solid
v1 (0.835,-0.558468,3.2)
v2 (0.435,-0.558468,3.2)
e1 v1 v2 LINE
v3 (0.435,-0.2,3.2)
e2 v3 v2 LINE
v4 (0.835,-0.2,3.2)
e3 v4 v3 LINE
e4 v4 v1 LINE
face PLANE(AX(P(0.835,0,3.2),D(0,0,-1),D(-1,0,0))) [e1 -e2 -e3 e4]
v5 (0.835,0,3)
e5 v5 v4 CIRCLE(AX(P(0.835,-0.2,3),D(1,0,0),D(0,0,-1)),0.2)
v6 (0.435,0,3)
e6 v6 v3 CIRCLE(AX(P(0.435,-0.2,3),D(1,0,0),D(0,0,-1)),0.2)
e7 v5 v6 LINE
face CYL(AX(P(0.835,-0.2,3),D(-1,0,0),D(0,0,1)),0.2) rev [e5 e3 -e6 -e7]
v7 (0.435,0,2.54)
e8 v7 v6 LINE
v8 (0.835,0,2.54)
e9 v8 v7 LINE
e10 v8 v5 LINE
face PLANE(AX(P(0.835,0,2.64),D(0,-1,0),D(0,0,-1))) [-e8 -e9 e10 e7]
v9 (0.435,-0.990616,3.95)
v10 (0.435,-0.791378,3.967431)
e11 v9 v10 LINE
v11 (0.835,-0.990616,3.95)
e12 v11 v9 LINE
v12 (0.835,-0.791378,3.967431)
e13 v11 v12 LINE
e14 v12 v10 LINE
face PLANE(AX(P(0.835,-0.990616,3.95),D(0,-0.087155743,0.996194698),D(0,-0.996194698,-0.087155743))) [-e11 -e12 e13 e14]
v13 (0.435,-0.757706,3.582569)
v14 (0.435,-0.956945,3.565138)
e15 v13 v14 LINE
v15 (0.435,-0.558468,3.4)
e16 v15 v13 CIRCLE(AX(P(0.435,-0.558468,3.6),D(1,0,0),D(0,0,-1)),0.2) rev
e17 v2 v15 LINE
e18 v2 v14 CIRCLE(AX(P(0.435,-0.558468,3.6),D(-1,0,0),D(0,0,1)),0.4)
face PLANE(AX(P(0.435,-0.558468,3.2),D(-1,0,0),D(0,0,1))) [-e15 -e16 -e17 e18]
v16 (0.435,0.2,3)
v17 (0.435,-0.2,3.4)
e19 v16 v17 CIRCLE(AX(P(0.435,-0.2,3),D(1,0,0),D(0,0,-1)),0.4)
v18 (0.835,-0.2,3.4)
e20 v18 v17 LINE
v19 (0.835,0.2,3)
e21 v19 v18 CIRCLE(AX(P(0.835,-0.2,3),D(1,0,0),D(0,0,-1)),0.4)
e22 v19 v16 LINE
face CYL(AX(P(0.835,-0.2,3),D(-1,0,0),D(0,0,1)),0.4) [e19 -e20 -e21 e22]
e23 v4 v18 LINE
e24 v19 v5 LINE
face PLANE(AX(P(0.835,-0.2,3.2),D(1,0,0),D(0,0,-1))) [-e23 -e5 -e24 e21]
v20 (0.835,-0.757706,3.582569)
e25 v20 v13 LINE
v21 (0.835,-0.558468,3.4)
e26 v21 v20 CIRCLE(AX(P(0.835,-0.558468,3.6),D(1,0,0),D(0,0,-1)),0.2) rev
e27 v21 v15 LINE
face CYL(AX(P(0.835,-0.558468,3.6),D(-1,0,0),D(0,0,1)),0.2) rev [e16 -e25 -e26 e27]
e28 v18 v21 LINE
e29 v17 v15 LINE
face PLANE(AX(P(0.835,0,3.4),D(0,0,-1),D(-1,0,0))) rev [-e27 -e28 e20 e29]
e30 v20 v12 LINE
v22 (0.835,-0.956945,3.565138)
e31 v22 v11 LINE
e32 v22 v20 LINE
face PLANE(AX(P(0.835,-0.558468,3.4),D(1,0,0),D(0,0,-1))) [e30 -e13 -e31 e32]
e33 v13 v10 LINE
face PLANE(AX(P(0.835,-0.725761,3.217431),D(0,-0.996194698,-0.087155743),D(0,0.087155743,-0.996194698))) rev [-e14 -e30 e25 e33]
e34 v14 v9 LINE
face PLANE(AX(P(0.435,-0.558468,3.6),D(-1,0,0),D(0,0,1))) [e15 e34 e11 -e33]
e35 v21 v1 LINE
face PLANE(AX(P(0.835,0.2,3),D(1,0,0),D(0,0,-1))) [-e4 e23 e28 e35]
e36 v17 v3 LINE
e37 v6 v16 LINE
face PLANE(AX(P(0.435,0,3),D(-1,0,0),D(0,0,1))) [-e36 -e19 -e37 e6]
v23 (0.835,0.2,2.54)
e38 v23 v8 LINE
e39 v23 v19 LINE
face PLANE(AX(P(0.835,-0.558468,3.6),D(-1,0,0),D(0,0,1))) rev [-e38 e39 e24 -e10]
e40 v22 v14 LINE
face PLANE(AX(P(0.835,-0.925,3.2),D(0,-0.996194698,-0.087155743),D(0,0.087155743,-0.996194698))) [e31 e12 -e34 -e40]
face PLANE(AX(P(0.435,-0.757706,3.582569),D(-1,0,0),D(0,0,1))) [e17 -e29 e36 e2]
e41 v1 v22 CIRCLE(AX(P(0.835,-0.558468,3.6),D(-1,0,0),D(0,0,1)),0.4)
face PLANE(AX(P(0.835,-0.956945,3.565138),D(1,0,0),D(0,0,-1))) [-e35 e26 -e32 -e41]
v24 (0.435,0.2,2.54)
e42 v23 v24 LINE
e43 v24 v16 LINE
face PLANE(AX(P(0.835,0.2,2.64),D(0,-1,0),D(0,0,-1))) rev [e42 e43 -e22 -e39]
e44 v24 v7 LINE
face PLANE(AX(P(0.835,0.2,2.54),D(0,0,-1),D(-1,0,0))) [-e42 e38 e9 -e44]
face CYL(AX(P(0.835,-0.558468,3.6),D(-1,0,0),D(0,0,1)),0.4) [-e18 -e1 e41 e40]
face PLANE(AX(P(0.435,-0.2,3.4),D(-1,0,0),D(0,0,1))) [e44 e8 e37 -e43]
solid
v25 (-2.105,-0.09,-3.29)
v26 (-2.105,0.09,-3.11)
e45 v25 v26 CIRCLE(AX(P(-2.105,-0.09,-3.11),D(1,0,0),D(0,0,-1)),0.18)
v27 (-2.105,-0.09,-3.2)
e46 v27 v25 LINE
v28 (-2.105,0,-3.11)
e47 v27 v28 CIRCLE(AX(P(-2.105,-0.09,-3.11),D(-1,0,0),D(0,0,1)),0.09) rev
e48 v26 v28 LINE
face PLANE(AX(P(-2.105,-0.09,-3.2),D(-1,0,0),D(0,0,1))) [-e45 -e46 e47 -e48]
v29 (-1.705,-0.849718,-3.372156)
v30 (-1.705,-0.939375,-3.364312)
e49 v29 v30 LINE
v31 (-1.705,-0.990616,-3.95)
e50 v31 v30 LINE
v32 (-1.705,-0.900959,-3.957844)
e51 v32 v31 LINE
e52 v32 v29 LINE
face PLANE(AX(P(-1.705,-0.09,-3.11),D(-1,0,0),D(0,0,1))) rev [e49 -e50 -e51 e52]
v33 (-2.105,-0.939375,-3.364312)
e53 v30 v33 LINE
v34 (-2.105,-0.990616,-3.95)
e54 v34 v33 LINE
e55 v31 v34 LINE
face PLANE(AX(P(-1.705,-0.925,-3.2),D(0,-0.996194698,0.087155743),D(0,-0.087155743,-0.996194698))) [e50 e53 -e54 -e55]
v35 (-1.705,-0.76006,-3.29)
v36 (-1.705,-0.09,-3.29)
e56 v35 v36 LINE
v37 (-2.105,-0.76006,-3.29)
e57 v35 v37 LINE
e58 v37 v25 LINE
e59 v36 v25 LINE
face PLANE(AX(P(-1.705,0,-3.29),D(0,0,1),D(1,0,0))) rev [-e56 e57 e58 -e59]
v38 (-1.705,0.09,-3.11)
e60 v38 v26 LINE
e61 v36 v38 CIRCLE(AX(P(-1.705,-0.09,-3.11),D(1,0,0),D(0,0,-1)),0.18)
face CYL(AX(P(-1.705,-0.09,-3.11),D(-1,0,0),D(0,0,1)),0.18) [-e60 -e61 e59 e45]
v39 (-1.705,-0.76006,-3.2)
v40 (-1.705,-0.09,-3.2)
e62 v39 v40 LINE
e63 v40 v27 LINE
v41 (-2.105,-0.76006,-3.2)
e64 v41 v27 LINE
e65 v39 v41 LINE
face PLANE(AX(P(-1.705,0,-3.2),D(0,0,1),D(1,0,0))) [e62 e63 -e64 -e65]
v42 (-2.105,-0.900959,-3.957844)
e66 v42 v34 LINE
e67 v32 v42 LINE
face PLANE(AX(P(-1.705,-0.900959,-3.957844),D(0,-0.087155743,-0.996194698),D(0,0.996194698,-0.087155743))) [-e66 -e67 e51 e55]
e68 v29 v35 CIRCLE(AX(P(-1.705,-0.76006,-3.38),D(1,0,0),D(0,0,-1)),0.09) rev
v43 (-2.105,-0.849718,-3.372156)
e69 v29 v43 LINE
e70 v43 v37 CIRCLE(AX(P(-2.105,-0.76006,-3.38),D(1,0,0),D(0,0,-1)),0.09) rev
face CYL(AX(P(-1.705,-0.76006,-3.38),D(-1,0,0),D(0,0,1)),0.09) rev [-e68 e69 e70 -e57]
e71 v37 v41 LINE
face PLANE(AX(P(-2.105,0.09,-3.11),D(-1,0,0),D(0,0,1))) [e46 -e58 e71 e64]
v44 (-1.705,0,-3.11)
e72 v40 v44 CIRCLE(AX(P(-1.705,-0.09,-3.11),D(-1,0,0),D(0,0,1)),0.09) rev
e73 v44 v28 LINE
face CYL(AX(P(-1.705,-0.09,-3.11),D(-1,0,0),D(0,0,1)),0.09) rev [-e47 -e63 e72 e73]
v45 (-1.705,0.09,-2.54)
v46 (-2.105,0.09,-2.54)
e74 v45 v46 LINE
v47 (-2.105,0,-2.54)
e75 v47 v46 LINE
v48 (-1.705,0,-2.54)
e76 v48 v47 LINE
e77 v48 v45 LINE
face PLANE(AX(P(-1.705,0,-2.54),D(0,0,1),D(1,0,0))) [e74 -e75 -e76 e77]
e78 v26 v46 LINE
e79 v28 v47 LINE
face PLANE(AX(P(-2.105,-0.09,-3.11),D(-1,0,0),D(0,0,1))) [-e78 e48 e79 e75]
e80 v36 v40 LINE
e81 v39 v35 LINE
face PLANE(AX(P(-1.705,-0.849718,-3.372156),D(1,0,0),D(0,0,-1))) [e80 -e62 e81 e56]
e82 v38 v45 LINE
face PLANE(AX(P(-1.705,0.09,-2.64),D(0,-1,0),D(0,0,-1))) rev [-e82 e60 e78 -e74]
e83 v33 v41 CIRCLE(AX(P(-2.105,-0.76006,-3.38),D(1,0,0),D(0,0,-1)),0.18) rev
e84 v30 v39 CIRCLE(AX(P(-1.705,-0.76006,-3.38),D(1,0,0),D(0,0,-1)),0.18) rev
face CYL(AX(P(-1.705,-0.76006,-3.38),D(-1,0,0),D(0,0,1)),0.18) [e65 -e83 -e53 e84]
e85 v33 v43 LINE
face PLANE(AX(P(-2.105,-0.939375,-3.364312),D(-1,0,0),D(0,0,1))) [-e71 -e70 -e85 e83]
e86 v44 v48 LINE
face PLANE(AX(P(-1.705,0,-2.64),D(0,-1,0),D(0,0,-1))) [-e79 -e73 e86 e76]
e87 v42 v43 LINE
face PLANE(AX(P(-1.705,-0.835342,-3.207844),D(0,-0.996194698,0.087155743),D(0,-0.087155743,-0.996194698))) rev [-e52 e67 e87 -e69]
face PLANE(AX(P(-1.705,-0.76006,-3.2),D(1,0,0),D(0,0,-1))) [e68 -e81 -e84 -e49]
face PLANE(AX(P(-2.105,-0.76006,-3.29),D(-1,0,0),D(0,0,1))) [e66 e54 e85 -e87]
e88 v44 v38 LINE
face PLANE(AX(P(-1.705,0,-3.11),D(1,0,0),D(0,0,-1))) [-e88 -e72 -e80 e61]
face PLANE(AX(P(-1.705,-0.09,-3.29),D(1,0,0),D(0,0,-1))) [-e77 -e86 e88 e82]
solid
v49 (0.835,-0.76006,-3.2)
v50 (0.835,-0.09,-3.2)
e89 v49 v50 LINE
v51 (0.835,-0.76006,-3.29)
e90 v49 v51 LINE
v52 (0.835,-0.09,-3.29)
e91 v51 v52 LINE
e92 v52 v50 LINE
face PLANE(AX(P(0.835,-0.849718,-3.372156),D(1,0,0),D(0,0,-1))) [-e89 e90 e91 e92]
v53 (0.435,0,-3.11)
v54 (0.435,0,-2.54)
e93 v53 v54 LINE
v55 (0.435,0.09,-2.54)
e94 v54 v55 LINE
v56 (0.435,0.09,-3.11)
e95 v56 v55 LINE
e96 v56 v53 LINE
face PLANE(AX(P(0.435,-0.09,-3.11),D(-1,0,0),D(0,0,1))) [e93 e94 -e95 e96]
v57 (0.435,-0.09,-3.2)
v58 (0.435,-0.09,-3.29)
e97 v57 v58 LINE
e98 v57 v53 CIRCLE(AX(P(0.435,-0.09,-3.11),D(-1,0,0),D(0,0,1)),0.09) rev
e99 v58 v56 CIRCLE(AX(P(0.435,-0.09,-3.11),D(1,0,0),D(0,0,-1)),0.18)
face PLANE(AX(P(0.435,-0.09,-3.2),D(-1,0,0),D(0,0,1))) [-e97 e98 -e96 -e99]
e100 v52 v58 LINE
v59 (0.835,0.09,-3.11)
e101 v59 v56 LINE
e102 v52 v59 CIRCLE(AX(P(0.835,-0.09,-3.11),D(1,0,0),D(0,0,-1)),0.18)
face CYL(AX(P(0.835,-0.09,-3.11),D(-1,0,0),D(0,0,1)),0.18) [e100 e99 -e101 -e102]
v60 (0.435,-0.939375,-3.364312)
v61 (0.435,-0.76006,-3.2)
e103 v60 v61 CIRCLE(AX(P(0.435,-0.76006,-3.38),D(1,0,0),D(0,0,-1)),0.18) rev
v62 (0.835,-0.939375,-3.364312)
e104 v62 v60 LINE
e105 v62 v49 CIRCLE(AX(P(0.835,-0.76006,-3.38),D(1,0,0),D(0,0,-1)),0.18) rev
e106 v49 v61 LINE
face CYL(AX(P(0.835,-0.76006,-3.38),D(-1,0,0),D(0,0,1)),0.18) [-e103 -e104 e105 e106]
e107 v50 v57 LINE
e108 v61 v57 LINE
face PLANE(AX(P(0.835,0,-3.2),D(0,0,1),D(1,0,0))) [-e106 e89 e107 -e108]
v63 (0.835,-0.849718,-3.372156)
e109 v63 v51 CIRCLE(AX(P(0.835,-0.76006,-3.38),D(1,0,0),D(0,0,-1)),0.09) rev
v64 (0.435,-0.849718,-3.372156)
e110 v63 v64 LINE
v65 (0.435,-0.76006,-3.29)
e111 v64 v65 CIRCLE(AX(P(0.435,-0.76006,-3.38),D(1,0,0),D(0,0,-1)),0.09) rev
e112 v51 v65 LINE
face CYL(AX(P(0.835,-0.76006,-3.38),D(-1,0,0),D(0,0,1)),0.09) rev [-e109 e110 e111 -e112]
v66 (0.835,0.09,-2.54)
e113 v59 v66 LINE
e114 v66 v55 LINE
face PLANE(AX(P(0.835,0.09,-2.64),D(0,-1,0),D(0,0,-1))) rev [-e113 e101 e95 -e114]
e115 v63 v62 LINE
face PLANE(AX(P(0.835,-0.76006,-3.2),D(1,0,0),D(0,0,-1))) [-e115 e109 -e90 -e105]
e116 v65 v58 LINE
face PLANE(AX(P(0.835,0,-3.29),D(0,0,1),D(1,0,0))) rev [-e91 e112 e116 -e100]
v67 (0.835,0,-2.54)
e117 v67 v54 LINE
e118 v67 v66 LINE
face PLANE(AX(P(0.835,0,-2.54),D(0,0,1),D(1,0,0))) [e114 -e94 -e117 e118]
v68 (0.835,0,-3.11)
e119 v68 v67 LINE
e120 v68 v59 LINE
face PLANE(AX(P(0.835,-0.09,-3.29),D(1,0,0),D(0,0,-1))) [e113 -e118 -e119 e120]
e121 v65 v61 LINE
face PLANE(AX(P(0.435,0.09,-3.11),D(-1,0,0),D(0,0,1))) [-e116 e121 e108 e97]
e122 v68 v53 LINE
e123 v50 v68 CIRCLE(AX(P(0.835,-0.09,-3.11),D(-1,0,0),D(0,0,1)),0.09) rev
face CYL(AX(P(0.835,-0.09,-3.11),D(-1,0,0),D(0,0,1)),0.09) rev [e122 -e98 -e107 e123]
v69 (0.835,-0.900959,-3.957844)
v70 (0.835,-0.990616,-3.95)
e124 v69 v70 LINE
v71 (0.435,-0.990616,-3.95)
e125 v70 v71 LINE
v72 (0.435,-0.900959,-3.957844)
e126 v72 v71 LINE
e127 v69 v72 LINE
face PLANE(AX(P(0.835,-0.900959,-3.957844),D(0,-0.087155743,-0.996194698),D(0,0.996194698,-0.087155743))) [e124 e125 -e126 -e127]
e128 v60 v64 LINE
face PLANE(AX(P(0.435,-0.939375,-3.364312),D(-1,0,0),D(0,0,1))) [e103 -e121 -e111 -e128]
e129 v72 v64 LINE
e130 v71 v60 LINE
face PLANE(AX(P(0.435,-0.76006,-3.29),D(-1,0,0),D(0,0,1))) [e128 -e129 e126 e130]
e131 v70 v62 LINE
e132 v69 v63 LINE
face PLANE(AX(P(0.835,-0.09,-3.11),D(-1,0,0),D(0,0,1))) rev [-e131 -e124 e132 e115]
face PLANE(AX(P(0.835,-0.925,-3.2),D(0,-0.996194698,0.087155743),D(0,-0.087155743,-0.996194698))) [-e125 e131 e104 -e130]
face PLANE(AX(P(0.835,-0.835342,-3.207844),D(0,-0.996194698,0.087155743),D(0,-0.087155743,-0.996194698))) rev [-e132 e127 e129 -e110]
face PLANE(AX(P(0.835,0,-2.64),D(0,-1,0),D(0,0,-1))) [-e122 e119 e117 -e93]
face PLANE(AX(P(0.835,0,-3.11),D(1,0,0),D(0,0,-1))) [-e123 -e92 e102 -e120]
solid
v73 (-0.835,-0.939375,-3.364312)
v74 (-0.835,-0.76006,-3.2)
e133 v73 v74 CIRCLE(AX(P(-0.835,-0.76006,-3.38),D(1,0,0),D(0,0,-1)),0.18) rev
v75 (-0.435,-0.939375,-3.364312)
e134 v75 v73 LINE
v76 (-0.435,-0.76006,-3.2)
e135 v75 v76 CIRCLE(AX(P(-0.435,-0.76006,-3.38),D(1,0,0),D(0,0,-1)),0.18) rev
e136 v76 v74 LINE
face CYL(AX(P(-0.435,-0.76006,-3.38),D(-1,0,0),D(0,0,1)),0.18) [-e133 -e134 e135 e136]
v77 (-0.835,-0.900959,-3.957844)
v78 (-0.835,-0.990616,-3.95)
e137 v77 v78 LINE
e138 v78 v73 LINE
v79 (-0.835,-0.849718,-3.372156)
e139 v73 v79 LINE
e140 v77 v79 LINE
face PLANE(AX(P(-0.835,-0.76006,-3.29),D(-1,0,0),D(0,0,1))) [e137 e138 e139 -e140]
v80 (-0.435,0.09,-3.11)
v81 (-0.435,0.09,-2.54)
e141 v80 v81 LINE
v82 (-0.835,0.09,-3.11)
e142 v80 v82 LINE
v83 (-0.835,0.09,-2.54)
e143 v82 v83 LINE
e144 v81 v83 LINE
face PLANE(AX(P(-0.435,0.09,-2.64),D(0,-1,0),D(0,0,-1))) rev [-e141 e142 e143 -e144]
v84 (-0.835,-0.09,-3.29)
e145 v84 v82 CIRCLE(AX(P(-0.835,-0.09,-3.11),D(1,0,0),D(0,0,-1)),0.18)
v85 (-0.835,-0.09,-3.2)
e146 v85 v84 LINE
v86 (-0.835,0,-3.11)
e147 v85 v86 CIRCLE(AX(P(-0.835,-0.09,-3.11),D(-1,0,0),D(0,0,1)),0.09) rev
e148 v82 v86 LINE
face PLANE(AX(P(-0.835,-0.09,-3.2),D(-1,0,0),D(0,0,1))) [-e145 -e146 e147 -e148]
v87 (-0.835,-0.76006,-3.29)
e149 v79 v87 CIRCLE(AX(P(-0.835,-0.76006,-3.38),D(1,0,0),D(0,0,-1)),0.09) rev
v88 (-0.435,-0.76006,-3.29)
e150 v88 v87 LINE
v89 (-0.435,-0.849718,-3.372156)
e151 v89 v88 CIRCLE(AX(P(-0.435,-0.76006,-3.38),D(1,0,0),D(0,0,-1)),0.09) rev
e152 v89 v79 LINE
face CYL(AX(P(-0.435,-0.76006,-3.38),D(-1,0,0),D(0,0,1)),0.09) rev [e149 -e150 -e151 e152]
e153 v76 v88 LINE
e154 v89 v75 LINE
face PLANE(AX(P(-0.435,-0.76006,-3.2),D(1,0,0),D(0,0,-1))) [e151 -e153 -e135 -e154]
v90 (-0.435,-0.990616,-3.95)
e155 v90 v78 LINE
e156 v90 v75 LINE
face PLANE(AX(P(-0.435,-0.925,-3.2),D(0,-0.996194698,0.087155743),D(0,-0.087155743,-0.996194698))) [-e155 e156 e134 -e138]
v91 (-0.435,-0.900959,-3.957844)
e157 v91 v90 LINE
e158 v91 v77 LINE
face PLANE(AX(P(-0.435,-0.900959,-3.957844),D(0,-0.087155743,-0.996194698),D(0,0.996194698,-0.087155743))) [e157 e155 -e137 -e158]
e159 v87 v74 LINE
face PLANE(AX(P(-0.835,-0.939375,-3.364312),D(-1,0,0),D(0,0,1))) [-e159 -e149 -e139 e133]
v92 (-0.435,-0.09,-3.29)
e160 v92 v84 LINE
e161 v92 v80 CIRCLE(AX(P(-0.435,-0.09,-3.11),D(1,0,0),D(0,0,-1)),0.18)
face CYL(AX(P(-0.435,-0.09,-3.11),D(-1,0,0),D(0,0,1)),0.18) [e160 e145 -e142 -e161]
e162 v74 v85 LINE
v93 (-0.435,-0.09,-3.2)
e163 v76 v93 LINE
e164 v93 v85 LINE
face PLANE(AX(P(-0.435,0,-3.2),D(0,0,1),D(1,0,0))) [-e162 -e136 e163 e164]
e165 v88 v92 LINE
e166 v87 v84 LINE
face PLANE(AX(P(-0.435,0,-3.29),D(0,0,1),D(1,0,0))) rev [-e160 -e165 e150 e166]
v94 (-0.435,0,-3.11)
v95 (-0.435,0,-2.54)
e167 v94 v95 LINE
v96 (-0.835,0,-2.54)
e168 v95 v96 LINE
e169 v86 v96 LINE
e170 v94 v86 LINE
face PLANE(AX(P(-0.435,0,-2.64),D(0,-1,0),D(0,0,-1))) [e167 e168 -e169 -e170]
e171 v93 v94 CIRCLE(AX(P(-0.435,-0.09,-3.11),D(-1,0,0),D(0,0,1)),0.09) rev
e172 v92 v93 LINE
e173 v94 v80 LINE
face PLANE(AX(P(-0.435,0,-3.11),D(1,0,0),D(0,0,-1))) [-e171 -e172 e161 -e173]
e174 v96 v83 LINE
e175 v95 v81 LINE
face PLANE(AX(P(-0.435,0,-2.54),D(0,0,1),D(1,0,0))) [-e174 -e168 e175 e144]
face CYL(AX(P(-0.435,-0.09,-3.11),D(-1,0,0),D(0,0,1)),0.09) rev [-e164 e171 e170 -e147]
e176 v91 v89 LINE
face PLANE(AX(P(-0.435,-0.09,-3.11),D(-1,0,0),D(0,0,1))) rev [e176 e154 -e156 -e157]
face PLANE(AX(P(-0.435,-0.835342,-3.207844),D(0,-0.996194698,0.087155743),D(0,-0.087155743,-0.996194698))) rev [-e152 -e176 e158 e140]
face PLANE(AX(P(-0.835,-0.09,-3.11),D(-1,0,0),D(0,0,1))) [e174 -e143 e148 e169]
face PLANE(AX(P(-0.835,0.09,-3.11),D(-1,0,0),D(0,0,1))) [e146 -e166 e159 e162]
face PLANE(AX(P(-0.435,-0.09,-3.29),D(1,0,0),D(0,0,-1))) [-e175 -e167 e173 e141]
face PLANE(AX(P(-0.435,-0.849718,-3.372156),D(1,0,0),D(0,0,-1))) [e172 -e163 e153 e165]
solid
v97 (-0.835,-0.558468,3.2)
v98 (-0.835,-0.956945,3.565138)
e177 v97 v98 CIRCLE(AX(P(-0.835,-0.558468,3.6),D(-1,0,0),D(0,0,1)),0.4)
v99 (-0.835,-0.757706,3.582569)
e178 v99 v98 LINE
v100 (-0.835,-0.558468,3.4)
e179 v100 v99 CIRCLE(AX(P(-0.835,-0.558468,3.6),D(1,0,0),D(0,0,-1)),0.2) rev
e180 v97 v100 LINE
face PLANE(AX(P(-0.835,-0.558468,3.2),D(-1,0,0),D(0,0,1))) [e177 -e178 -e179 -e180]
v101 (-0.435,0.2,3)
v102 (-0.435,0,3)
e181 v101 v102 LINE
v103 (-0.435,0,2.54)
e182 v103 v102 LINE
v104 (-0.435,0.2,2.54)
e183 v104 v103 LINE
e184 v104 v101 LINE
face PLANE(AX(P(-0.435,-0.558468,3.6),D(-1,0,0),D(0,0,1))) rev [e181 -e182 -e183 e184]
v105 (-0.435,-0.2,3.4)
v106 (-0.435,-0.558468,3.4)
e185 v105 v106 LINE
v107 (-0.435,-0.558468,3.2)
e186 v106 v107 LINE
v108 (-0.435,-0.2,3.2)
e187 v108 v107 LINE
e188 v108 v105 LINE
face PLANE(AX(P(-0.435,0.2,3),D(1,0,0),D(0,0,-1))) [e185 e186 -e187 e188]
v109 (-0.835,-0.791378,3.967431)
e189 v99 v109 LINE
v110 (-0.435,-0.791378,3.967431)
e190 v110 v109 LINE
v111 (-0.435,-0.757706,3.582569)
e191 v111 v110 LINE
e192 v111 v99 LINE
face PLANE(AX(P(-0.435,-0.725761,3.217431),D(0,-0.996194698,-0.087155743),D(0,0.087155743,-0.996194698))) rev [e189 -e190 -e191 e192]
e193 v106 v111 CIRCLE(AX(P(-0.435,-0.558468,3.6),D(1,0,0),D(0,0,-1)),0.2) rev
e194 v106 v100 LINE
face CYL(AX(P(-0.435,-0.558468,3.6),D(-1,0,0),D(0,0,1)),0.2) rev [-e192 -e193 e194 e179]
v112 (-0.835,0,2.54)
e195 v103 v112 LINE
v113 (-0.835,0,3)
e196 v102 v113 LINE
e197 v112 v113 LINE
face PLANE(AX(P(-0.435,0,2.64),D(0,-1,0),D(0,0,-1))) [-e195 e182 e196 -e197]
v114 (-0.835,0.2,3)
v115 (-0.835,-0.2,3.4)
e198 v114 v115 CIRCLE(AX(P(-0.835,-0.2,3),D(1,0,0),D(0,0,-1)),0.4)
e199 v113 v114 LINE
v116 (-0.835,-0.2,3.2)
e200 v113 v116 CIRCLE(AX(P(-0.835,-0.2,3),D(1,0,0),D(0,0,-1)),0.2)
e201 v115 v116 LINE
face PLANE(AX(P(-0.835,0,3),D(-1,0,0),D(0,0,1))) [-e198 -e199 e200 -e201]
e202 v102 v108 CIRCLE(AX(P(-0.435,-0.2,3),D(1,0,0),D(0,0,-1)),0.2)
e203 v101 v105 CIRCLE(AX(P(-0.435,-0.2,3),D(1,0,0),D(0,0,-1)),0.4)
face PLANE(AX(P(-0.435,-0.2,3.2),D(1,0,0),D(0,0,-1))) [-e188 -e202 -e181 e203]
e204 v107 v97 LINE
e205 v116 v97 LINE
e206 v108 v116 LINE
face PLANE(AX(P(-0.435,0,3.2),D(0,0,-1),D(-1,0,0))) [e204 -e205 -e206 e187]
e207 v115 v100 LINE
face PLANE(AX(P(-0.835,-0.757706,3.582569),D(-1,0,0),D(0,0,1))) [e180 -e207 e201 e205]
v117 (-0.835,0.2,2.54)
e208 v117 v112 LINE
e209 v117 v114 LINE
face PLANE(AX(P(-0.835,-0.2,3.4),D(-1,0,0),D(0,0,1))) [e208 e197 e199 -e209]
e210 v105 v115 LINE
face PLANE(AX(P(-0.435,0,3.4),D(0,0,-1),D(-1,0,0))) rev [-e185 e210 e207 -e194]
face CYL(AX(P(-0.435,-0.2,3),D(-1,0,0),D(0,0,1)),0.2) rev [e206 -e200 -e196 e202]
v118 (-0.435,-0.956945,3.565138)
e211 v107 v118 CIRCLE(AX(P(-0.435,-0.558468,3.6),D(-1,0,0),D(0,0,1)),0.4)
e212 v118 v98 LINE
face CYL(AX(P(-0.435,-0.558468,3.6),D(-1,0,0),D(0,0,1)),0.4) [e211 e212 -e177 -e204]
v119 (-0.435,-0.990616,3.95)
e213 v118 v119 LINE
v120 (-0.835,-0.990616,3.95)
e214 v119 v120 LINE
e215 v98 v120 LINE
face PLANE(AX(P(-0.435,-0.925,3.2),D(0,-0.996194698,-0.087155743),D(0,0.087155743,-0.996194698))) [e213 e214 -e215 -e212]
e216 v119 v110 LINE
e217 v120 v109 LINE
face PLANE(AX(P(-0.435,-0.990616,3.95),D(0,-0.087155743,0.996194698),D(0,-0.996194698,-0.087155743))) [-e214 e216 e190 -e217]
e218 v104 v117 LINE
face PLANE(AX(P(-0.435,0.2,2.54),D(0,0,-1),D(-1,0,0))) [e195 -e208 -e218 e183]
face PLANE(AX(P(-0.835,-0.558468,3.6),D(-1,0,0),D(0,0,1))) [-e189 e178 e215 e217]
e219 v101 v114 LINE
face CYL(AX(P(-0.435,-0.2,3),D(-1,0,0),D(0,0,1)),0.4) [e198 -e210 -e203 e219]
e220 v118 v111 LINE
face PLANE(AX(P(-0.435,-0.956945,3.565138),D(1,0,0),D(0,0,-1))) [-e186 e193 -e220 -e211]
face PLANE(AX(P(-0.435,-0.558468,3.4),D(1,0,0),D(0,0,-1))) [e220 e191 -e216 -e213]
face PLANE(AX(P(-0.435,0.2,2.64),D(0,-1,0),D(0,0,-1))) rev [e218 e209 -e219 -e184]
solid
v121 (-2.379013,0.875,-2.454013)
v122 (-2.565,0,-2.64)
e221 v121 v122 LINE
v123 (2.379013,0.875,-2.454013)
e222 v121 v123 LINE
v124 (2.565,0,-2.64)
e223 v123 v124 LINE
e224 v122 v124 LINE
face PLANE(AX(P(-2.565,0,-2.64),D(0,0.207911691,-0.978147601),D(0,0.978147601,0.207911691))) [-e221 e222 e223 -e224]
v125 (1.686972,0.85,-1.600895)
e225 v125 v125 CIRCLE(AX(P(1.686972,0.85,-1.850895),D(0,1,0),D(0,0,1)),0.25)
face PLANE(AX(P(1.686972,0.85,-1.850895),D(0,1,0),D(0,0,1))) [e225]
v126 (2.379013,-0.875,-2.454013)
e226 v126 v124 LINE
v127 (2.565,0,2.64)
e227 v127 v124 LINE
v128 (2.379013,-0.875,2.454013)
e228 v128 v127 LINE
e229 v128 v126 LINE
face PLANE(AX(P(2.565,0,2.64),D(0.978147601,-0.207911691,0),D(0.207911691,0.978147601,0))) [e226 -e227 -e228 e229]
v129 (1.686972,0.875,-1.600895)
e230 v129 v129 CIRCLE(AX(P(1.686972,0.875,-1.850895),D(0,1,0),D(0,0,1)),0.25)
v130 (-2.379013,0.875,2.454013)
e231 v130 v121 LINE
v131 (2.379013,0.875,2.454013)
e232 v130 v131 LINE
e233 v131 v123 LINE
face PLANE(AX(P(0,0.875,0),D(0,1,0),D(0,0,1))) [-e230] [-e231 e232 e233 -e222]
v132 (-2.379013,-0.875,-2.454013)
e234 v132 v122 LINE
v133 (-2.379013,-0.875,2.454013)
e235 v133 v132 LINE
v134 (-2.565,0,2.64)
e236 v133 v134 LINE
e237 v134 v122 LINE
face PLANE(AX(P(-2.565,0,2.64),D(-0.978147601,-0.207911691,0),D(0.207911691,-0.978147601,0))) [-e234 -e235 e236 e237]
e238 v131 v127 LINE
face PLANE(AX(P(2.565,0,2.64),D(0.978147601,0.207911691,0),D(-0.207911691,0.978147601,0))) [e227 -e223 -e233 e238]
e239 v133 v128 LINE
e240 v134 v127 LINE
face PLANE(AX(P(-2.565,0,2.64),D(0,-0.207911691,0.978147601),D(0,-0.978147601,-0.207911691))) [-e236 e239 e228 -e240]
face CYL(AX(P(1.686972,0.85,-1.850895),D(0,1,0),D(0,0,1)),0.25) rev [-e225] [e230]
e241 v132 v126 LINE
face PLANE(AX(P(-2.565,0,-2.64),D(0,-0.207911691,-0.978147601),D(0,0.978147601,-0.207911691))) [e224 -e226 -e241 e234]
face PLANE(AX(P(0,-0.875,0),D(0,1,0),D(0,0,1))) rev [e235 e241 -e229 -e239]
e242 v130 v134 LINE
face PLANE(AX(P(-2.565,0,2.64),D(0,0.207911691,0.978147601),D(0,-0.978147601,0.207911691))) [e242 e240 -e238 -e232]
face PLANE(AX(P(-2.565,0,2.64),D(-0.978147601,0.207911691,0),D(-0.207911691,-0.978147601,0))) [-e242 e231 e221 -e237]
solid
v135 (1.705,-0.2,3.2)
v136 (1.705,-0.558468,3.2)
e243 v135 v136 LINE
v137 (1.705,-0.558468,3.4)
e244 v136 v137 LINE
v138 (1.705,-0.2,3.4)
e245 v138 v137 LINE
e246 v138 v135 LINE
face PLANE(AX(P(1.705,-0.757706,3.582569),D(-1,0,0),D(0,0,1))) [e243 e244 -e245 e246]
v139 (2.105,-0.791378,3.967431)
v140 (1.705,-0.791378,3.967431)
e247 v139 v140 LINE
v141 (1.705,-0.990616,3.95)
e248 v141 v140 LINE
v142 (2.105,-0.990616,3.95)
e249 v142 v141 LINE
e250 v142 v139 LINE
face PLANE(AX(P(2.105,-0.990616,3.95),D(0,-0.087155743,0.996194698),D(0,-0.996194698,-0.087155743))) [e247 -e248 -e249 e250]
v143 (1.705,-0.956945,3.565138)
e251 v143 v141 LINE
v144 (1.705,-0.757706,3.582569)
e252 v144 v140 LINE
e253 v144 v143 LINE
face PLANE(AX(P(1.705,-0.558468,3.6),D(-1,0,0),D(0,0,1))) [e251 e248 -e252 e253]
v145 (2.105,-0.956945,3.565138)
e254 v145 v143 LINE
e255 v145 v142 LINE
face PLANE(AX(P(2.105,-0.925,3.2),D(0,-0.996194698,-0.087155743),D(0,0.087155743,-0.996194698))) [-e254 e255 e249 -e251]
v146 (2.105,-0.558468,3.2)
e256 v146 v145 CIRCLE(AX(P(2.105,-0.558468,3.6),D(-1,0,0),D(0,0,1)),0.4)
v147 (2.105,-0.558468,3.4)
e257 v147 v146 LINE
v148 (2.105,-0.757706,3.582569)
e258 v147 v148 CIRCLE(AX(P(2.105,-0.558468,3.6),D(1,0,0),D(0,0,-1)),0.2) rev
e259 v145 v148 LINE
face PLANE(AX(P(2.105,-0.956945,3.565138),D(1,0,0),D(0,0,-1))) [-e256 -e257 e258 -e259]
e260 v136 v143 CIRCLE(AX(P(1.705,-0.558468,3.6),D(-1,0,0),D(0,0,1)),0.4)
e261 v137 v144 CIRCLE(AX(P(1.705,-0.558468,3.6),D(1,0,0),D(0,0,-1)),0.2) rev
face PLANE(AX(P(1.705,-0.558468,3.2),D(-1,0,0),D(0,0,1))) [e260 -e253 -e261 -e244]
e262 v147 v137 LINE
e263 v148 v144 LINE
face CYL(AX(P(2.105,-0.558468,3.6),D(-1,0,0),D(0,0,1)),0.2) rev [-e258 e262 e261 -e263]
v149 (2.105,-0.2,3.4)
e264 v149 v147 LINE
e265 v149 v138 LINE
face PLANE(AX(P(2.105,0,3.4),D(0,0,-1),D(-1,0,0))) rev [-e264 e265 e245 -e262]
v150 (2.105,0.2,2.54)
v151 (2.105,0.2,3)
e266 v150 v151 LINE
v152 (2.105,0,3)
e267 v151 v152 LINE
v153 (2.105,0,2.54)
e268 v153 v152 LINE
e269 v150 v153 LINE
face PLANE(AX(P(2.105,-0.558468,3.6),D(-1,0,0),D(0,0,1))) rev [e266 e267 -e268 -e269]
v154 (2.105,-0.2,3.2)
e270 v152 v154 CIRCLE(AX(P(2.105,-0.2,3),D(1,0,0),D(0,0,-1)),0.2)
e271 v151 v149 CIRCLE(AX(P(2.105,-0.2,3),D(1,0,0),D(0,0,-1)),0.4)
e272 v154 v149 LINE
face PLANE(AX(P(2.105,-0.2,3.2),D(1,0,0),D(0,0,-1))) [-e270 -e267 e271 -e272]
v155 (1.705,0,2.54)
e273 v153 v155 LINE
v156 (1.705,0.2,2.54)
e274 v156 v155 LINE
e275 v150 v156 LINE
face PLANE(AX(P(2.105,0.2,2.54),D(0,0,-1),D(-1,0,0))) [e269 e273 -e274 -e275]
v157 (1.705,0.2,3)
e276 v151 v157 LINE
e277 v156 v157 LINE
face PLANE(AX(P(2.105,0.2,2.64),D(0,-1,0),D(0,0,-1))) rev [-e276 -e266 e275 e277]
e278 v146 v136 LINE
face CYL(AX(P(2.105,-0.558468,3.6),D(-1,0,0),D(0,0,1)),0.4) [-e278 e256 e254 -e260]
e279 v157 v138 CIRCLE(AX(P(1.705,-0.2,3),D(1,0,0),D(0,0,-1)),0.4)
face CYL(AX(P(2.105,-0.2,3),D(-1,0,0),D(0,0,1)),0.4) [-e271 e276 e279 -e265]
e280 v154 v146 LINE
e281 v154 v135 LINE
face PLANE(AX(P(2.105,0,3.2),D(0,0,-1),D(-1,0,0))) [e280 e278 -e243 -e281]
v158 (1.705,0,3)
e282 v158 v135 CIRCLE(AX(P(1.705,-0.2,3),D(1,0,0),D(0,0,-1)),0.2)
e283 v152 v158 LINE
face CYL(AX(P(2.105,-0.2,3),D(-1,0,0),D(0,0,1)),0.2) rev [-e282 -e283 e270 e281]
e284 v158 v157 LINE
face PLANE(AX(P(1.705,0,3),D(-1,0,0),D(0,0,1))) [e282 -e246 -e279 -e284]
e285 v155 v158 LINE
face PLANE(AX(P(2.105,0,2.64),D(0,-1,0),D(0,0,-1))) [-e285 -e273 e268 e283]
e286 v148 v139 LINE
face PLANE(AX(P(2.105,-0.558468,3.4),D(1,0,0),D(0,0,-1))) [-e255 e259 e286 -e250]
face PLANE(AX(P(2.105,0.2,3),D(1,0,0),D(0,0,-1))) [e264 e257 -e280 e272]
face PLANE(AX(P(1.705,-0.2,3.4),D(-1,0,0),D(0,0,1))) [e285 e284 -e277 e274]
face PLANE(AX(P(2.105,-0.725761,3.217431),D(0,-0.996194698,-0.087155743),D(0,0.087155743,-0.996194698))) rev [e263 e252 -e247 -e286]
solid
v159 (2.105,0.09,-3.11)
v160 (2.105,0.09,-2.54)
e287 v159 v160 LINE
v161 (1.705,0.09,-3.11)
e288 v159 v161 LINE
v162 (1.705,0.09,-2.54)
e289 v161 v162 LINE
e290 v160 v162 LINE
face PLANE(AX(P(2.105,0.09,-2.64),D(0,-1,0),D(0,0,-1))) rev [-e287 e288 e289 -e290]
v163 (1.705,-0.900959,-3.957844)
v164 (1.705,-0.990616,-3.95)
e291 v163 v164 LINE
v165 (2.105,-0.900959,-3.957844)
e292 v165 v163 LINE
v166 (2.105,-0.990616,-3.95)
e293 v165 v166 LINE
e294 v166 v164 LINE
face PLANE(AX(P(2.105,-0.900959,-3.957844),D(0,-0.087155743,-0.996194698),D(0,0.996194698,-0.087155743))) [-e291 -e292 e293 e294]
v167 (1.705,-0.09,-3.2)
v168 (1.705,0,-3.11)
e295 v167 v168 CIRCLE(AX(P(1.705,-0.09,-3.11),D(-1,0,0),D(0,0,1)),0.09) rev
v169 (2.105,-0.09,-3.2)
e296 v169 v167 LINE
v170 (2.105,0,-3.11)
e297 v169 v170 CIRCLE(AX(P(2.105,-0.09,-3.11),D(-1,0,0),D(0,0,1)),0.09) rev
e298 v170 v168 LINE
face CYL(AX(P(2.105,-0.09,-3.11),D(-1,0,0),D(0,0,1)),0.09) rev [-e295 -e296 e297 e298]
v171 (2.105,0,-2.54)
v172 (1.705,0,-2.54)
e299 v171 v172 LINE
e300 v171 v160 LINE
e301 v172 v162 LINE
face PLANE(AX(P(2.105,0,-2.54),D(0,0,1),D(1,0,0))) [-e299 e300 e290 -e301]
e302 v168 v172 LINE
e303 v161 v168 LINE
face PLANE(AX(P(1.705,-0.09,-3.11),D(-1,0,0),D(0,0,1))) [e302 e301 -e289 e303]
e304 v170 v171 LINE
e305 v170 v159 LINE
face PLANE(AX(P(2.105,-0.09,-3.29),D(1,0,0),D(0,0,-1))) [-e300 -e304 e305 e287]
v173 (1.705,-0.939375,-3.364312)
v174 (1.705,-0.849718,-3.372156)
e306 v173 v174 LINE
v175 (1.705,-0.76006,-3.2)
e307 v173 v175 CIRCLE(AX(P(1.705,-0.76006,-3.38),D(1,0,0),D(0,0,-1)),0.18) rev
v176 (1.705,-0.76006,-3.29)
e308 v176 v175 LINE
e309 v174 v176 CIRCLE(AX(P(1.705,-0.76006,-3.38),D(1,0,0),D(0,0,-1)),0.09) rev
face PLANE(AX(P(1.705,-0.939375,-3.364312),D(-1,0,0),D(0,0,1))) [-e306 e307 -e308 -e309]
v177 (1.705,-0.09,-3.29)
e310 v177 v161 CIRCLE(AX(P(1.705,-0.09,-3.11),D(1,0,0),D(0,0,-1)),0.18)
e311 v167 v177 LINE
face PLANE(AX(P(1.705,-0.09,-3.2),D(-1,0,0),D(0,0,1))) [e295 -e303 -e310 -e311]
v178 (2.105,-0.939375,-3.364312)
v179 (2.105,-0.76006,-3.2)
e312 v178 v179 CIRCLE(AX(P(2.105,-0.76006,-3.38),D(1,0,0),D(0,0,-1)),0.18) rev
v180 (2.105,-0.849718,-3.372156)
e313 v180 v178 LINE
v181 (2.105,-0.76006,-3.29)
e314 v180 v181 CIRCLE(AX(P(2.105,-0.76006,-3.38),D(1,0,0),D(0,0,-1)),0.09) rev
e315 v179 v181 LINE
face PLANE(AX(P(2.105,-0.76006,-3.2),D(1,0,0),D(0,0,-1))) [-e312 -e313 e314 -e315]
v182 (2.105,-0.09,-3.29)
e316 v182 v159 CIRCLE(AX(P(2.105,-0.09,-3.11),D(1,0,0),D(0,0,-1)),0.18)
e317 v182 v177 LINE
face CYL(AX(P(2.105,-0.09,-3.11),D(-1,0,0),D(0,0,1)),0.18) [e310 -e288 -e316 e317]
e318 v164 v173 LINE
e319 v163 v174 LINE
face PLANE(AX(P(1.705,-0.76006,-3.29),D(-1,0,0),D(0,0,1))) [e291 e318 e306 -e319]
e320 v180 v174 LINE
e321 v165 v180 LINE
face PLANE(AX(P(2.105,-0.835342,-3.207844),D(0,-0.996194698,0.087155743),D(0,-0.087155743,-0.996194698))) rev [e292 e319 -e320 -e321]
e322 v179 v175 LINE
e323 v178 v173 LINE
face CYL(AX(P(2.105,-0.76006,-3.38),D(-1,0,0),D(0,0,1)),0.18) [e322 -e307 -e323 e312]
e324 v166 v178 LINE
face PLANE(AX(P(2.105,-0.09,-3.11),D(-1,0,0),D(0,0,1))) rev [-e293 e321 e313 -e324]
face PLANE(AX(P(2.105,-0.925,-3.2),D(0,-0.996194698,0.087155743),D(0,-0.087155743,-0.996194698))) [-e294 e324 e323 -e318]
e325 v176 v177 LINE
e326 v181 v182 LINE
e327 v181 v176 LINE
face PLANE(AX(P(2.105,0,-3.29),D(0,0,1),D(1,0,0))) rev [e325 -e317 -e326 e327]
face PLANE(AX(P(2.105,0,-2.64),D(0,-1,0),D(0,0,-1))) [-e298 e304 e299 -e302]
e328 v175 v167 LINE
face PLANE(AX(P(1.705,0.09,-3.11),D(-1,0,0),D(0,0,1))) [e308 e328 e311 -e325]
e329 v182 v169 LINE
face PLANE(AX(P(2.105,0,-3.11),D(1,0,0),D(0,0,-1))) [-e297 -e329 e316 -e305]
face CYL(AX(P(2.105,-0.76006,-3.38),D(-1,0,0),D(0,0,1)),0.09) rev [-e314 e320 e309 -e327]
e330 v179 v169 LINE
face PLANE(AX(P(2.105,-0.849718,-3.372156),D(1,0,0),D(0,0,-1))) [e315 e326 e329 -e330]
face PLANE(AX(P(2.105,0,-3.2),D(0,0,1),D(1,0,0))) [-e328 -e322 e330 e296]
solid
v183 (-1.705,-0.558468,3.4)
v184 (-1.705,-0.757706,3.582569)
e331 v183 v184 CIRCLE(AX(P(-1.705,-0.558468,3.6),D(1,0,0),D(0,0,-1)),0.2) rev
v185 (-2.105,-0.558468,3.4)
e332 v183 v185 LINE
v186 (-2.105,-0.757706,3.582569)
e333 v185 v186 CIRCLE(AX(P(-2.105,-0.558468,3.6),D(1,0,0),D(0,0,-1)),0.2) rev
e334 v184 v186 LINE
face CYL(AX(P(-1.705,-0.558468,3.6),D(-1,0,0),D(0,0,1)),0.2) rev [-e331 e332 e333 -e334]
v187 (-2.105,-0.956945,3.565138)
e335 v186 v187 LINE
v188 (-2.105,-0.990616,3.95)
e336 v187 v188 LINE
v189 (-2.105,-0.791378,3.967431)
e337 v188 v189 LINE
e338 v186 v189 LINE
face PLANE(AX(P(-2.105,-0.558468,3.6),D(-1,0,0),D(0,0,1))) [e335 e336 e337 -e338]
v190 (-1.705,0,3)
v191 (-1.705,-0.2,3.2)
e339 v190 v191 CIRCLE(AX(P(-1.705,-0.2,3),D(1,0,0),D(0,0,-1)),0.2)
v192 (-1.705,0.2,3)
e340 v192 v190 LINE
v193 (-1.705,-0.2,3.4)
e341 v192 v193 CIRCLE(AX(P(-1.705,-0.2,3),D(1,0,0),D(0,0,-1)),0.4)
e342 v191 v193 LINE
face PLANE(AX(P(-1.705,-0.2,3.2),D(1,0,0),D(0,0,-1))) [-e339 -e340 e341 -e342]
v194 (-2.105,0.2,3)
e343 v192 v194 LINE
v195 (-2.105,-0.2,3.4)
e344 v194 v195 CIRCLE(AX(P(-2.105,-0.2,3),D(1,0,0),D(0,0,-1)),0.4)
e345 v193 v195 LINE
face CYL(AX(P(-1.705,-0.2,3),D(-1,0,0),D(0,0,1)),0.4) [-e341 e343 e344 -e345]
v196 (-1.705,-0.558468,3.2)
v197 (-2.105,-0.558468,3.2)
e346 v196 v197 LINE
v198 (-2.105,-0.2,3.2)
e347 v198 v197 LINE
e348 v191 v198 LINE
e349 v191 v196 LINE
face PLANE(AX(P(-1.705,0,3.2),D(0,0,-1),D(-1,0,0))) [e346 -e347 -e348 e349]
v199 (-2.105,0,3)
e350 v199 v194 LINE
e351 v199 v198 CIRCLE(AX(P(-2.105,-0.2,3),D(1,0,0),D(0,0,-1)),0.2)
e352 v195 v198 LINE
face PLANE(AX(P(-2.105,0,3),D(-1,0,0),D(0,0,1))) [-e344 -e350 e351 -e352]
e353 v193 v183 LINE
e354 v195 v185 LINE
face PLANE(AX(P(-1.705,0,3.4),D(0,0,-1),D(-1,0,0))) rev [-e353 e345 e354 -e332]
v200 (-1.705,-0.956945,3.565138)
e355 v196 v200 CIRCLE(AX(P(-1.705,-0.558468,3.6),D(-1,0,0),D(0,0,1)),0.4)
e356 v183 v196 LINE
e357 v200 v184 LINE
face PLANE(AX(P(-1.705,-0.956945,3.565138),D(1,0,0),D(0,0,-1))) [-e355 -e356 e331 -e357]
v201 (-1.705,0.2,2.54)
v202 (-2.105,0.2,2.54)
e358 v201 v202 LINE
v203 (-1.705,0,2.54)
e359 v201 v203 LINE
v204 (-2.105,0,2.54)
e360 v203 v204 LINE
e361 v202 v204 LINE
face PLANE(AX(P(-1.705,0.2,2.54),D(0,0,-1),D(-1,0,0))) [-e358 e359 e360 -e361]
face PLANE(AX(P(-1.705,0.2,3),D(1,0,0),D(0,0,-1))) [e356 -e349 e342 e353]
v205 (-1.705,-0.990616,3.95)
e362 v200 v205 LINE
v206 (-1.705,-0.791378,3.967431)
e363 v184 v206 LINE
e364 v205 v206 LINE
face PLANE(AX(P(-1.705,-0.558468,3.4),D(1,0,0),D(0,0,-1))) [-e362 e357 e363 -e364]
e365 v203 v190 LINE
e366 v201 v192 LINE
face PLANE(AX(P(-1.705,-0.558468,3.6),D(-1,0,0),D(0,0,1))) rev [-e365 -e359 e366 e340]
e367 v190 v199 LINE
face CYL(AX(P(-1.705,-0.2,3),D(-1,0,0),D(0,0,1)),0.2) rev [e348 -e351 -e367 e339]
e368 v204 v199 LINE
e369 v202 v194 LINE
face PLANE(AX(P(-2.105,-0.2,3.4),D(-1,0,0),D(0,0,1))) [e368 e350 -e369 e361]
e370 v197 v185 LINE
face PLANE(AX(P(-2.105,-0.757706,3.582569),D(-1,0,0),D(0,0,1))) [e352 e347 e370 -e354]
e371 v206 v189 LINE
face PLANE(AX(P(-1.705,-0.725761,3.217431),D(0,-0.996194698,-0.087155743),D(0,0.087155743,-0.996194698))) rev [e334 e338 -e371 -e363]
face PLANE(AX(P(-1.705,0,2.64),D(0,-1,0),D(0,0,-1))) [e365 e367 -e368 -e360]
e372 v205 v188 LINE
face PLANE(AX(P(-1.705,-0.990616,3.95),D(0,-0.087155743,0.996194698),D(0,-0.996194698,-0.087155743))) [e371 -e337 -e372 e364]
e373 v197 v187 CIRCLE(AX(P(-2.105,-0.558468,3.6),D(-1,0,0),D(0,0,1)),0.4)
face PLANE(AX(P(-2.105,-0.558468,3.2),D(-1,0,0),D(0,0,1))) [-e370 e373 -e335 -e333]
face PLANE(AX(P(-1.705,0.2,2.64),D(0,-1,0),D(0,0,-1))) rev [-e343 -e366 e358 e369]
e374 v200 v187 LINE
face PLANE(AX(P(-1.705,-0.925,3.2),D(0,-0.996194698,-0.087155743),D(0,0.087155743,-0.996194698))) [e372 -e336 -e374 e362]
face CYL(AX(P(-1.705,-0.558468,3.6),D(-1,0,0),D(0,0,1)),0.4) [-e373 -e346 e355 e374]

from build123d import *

# Parameters (mm, degrees)
SKETCH1_W                     = 5.13
SKETCH1_H                     = 5.28
BOSS_EXTRUDE1_DEPTH           = 0.875
BOSS_EXTRUDE1_TAPER           = 12
BOSS_EXTRUDE1_OTHER_WAY_DEPTH = 0.875
BOSS_EXTRUDE1_OTHER_WAY_TAPER = 12
BASE_FLANGE1_DEPTH            = 0.2
BASE_FLANGE1_DEPTH_BACK       = 0.2
LPATTERN1_COUNT               = 3
LPATTERN1_PITCH               = 1.27
LPATTERN1_2_COUNT             = 2
LPATTERN1_2_PITCH             = 1.27
BASE_FLANGE2_DEPTH            = 0.2
BASE_FLANGE2_DEPTH_BACK       = 0.2
LPATTERN2_COUNT               = 2
LPATTERN2_PITCH               = 1.27
LPATTERN2_2_COUNT             = 3
LPATTERN2_2_PITCH             = 1.27
SKETCH87_R                    = 0.25
CUT_EXTRUDE1_DEPTH            = 0.025


# Sheet-metal steps are written as plain solids
with BuildPart() as part:
    # Sketch1 → Boss-Extrude1 (new body)
    with BuildSketch(Plane(origin=(0, 0, 0), x_dir=(1, 0, 0), z_dir=(0, 1, 0))):
        Rectangle(SKETCH1_W, SKETCH1_H)
    extrude(amount=BOSS_EXTRUDE1_DEPTH, taper=BOSS_EXTRUDE1_TAPER)

    # Sketch1 → Boss-Extrude1 other way (add)
    with BuildSketch(Plane(origin=(0, 0, 0), x_dir=(1, 0, 0), z_dir=(0, 1, 0))):
        Rectangle(SKETCH1_W, SKETCH1_H)
    extrude(amount=-BOSS_EXTRUDE1_OTHER_WAY_DEPTH, taper=BOSS_EXTRUDE1_OTHER_WAY_TAPER)

    # Sketch87 → Cut-Extrude1 (cut)
    with BuildSketch(Plane(origin=(0, 0.875, 0), x_dir=(1, 0, 0), z_dir=(0, 1, 0))):
        with Locations(Location((1.686972144, 1.850895493, 0), (0, 0, 270))):
            Circle(SKETCH87_R)
    extrude(amount=-CUT_EXTRUDE1_DEPTH, mode=Mode.SUBTRACT)


with BuildPart() as body_2:
    # Sketch2 → Base-Flange1 (new, two sides: drawn at the far end of the back side and taken through both)
    with BuildSketch(Plane(origin=(-0.635, 0, 0), x_dir=(0, 0, -1), z_dir=(1, 0, 0)).offset(-BASE_FLANGE1_DEPTH_BACK)):
        with BuildLine():
            Line((-2.54, 0), (-2.64, 0))
            Line((-2.64, 0), (-3, 0))
            ThreePointArc((-3, 0), (-3.141421356, -0.058578644), (-3.2, -0.2))
            Line((-3.2, -0.2), (-3.2, -0.55846753))
            ThreePointArc((-3.2, -0.55846753), (-3.305089065, -0.828703613), (-3.565137703, -0.95694541))
            Line((-3.565137703, -0.95694541), (-3.95, -0.990616498))
            Line((-3.95, -0.990616498), (-3.967431149, -0.791377558))
            Line((-3.967431149, -0.791377558), (-3.582568851, -0.75770647))
            ThreePointArc((-3.582568851, -0.75770647), (-3.452544533, -0.693585572), (-3.4, -0.55846753))
            Line((-3.4, -0.55846753), (-3.4, -0.2))
            ThreePointArc((-3.4, -0.2), (-3.282842712, 0.082842712), (-3, 0.2))
            Line((-3, 0.2), (-2.64, 0.2))
            Line((-2.64, 0.2), (-2.54, 0.2))
            Line((-2.54, 0.2), (-2.54, 0))
        make_face()
    extrude(amount=BASE_FLANGE1_DEPTH + BASE_FLANGE1_DEPTH_BACK)


with BuildPart() as lpattern1_1:
    # LPattern1: pattern copy
    add(body_2.part.moved(Location(Vector(1, 0, 0) * (1 * LPATTERN1_PITCH))))


with BuildPart() as lpattern1_2:
    # LPattern1: pattern copy
    add(body_2.part.moved(Location(Vector(1, 0, 0) * (2 * LPATTERN1_PITCH))))


with BuildPart() as lpattern1_2_1:
    # LPattern1 2: pattern copy
    add(body_2.part.moved(Location(Vector(-1, 0, 0) * (1 * LPATTERN1_2_PITCH))))


with BuildPart() as body_6:
    # Sketch58 → Base-Flange2 (new, two sides: drawn at the far end of the back side and taken through both)
    with BuildSketch(Plane(origin=(-0.635, 0, 0), x_dir=(0, 0, -1), z_dir=(1, 0, 0)).offset(-BASE_FLANGE2_DEPTH_BACK)):
        with BuildLine():
            Line((2.54, 0), (2.64, 0))
            Line((2.64, 0), (3.11, 0))
            ThreePointArc((3.11, 0), (3.17363961, -0.02636039), (3.2, -0.09))
            Line((3.2, -0.09), (3.2, -0.760060389))
            ThreePointArc((3.2, -0.760060389), (3.247290079, -0.881666626), (3.364311966, -0.939375434))
            Line((3.364311966, -0.939375434), (3.95, -0.990616498))
            Line((3.95, -0.990616498), (3.957844017, -0.900958975))
            Line((3.957844017, -0.900958975), (3.372155983, -0.849717912))
            ThreePointArc((3.372155983, -0.849717912), (3.31364504, -0.820863507), (3.29, -0.760060389))
            Line((3.29, -0.760060389), (3.29, -0.09))
            ThreePointArc((3.29, -0.09), (3.237279221, 0.037279221), (3.11, 0.09))
            Line((3.11, 0.09), (2.64, 0.09))
            Line((2.64, 0.09), (2.54, 0.09))
            Line((2.54, 0.09), (2.54, 0))
        make_face()
    extrude(amount=BASE_FLANGE2_DEPTH + BASE_FLANGE2_DEPTH_BACK)


with BuildPart() as lpattern2_1:
    # LPattern2: pattern copy
    add(body_6.part.moved(Location(Vector(-1, 0, 0) * (1 * LPATTERN2_PITCH))))


with BuildPart() as lpattern2_2_1:
    # LPattern2 2: pattern copy
    add(body_6.part.moved(Location(Vector(1, 0, 0) * (1 * LPATTERN2_2_PITCH))))


with BuildPart() as lpattern2_2_2:
    # LPattern2 2: pattern copy
    add(body_6.part.moved(Location(Vector(1, 0, 0) * (2 * LPATTERN2_2_PITCH))))


solid = Compound([part.part, body_2.part, lpattern1_1.part, lpattern1_2.part, lpattern1_2_1.part, body_6.part, lpattern2_1.part, lpattern2_2_1.part, lpattern2_2_2.part])
